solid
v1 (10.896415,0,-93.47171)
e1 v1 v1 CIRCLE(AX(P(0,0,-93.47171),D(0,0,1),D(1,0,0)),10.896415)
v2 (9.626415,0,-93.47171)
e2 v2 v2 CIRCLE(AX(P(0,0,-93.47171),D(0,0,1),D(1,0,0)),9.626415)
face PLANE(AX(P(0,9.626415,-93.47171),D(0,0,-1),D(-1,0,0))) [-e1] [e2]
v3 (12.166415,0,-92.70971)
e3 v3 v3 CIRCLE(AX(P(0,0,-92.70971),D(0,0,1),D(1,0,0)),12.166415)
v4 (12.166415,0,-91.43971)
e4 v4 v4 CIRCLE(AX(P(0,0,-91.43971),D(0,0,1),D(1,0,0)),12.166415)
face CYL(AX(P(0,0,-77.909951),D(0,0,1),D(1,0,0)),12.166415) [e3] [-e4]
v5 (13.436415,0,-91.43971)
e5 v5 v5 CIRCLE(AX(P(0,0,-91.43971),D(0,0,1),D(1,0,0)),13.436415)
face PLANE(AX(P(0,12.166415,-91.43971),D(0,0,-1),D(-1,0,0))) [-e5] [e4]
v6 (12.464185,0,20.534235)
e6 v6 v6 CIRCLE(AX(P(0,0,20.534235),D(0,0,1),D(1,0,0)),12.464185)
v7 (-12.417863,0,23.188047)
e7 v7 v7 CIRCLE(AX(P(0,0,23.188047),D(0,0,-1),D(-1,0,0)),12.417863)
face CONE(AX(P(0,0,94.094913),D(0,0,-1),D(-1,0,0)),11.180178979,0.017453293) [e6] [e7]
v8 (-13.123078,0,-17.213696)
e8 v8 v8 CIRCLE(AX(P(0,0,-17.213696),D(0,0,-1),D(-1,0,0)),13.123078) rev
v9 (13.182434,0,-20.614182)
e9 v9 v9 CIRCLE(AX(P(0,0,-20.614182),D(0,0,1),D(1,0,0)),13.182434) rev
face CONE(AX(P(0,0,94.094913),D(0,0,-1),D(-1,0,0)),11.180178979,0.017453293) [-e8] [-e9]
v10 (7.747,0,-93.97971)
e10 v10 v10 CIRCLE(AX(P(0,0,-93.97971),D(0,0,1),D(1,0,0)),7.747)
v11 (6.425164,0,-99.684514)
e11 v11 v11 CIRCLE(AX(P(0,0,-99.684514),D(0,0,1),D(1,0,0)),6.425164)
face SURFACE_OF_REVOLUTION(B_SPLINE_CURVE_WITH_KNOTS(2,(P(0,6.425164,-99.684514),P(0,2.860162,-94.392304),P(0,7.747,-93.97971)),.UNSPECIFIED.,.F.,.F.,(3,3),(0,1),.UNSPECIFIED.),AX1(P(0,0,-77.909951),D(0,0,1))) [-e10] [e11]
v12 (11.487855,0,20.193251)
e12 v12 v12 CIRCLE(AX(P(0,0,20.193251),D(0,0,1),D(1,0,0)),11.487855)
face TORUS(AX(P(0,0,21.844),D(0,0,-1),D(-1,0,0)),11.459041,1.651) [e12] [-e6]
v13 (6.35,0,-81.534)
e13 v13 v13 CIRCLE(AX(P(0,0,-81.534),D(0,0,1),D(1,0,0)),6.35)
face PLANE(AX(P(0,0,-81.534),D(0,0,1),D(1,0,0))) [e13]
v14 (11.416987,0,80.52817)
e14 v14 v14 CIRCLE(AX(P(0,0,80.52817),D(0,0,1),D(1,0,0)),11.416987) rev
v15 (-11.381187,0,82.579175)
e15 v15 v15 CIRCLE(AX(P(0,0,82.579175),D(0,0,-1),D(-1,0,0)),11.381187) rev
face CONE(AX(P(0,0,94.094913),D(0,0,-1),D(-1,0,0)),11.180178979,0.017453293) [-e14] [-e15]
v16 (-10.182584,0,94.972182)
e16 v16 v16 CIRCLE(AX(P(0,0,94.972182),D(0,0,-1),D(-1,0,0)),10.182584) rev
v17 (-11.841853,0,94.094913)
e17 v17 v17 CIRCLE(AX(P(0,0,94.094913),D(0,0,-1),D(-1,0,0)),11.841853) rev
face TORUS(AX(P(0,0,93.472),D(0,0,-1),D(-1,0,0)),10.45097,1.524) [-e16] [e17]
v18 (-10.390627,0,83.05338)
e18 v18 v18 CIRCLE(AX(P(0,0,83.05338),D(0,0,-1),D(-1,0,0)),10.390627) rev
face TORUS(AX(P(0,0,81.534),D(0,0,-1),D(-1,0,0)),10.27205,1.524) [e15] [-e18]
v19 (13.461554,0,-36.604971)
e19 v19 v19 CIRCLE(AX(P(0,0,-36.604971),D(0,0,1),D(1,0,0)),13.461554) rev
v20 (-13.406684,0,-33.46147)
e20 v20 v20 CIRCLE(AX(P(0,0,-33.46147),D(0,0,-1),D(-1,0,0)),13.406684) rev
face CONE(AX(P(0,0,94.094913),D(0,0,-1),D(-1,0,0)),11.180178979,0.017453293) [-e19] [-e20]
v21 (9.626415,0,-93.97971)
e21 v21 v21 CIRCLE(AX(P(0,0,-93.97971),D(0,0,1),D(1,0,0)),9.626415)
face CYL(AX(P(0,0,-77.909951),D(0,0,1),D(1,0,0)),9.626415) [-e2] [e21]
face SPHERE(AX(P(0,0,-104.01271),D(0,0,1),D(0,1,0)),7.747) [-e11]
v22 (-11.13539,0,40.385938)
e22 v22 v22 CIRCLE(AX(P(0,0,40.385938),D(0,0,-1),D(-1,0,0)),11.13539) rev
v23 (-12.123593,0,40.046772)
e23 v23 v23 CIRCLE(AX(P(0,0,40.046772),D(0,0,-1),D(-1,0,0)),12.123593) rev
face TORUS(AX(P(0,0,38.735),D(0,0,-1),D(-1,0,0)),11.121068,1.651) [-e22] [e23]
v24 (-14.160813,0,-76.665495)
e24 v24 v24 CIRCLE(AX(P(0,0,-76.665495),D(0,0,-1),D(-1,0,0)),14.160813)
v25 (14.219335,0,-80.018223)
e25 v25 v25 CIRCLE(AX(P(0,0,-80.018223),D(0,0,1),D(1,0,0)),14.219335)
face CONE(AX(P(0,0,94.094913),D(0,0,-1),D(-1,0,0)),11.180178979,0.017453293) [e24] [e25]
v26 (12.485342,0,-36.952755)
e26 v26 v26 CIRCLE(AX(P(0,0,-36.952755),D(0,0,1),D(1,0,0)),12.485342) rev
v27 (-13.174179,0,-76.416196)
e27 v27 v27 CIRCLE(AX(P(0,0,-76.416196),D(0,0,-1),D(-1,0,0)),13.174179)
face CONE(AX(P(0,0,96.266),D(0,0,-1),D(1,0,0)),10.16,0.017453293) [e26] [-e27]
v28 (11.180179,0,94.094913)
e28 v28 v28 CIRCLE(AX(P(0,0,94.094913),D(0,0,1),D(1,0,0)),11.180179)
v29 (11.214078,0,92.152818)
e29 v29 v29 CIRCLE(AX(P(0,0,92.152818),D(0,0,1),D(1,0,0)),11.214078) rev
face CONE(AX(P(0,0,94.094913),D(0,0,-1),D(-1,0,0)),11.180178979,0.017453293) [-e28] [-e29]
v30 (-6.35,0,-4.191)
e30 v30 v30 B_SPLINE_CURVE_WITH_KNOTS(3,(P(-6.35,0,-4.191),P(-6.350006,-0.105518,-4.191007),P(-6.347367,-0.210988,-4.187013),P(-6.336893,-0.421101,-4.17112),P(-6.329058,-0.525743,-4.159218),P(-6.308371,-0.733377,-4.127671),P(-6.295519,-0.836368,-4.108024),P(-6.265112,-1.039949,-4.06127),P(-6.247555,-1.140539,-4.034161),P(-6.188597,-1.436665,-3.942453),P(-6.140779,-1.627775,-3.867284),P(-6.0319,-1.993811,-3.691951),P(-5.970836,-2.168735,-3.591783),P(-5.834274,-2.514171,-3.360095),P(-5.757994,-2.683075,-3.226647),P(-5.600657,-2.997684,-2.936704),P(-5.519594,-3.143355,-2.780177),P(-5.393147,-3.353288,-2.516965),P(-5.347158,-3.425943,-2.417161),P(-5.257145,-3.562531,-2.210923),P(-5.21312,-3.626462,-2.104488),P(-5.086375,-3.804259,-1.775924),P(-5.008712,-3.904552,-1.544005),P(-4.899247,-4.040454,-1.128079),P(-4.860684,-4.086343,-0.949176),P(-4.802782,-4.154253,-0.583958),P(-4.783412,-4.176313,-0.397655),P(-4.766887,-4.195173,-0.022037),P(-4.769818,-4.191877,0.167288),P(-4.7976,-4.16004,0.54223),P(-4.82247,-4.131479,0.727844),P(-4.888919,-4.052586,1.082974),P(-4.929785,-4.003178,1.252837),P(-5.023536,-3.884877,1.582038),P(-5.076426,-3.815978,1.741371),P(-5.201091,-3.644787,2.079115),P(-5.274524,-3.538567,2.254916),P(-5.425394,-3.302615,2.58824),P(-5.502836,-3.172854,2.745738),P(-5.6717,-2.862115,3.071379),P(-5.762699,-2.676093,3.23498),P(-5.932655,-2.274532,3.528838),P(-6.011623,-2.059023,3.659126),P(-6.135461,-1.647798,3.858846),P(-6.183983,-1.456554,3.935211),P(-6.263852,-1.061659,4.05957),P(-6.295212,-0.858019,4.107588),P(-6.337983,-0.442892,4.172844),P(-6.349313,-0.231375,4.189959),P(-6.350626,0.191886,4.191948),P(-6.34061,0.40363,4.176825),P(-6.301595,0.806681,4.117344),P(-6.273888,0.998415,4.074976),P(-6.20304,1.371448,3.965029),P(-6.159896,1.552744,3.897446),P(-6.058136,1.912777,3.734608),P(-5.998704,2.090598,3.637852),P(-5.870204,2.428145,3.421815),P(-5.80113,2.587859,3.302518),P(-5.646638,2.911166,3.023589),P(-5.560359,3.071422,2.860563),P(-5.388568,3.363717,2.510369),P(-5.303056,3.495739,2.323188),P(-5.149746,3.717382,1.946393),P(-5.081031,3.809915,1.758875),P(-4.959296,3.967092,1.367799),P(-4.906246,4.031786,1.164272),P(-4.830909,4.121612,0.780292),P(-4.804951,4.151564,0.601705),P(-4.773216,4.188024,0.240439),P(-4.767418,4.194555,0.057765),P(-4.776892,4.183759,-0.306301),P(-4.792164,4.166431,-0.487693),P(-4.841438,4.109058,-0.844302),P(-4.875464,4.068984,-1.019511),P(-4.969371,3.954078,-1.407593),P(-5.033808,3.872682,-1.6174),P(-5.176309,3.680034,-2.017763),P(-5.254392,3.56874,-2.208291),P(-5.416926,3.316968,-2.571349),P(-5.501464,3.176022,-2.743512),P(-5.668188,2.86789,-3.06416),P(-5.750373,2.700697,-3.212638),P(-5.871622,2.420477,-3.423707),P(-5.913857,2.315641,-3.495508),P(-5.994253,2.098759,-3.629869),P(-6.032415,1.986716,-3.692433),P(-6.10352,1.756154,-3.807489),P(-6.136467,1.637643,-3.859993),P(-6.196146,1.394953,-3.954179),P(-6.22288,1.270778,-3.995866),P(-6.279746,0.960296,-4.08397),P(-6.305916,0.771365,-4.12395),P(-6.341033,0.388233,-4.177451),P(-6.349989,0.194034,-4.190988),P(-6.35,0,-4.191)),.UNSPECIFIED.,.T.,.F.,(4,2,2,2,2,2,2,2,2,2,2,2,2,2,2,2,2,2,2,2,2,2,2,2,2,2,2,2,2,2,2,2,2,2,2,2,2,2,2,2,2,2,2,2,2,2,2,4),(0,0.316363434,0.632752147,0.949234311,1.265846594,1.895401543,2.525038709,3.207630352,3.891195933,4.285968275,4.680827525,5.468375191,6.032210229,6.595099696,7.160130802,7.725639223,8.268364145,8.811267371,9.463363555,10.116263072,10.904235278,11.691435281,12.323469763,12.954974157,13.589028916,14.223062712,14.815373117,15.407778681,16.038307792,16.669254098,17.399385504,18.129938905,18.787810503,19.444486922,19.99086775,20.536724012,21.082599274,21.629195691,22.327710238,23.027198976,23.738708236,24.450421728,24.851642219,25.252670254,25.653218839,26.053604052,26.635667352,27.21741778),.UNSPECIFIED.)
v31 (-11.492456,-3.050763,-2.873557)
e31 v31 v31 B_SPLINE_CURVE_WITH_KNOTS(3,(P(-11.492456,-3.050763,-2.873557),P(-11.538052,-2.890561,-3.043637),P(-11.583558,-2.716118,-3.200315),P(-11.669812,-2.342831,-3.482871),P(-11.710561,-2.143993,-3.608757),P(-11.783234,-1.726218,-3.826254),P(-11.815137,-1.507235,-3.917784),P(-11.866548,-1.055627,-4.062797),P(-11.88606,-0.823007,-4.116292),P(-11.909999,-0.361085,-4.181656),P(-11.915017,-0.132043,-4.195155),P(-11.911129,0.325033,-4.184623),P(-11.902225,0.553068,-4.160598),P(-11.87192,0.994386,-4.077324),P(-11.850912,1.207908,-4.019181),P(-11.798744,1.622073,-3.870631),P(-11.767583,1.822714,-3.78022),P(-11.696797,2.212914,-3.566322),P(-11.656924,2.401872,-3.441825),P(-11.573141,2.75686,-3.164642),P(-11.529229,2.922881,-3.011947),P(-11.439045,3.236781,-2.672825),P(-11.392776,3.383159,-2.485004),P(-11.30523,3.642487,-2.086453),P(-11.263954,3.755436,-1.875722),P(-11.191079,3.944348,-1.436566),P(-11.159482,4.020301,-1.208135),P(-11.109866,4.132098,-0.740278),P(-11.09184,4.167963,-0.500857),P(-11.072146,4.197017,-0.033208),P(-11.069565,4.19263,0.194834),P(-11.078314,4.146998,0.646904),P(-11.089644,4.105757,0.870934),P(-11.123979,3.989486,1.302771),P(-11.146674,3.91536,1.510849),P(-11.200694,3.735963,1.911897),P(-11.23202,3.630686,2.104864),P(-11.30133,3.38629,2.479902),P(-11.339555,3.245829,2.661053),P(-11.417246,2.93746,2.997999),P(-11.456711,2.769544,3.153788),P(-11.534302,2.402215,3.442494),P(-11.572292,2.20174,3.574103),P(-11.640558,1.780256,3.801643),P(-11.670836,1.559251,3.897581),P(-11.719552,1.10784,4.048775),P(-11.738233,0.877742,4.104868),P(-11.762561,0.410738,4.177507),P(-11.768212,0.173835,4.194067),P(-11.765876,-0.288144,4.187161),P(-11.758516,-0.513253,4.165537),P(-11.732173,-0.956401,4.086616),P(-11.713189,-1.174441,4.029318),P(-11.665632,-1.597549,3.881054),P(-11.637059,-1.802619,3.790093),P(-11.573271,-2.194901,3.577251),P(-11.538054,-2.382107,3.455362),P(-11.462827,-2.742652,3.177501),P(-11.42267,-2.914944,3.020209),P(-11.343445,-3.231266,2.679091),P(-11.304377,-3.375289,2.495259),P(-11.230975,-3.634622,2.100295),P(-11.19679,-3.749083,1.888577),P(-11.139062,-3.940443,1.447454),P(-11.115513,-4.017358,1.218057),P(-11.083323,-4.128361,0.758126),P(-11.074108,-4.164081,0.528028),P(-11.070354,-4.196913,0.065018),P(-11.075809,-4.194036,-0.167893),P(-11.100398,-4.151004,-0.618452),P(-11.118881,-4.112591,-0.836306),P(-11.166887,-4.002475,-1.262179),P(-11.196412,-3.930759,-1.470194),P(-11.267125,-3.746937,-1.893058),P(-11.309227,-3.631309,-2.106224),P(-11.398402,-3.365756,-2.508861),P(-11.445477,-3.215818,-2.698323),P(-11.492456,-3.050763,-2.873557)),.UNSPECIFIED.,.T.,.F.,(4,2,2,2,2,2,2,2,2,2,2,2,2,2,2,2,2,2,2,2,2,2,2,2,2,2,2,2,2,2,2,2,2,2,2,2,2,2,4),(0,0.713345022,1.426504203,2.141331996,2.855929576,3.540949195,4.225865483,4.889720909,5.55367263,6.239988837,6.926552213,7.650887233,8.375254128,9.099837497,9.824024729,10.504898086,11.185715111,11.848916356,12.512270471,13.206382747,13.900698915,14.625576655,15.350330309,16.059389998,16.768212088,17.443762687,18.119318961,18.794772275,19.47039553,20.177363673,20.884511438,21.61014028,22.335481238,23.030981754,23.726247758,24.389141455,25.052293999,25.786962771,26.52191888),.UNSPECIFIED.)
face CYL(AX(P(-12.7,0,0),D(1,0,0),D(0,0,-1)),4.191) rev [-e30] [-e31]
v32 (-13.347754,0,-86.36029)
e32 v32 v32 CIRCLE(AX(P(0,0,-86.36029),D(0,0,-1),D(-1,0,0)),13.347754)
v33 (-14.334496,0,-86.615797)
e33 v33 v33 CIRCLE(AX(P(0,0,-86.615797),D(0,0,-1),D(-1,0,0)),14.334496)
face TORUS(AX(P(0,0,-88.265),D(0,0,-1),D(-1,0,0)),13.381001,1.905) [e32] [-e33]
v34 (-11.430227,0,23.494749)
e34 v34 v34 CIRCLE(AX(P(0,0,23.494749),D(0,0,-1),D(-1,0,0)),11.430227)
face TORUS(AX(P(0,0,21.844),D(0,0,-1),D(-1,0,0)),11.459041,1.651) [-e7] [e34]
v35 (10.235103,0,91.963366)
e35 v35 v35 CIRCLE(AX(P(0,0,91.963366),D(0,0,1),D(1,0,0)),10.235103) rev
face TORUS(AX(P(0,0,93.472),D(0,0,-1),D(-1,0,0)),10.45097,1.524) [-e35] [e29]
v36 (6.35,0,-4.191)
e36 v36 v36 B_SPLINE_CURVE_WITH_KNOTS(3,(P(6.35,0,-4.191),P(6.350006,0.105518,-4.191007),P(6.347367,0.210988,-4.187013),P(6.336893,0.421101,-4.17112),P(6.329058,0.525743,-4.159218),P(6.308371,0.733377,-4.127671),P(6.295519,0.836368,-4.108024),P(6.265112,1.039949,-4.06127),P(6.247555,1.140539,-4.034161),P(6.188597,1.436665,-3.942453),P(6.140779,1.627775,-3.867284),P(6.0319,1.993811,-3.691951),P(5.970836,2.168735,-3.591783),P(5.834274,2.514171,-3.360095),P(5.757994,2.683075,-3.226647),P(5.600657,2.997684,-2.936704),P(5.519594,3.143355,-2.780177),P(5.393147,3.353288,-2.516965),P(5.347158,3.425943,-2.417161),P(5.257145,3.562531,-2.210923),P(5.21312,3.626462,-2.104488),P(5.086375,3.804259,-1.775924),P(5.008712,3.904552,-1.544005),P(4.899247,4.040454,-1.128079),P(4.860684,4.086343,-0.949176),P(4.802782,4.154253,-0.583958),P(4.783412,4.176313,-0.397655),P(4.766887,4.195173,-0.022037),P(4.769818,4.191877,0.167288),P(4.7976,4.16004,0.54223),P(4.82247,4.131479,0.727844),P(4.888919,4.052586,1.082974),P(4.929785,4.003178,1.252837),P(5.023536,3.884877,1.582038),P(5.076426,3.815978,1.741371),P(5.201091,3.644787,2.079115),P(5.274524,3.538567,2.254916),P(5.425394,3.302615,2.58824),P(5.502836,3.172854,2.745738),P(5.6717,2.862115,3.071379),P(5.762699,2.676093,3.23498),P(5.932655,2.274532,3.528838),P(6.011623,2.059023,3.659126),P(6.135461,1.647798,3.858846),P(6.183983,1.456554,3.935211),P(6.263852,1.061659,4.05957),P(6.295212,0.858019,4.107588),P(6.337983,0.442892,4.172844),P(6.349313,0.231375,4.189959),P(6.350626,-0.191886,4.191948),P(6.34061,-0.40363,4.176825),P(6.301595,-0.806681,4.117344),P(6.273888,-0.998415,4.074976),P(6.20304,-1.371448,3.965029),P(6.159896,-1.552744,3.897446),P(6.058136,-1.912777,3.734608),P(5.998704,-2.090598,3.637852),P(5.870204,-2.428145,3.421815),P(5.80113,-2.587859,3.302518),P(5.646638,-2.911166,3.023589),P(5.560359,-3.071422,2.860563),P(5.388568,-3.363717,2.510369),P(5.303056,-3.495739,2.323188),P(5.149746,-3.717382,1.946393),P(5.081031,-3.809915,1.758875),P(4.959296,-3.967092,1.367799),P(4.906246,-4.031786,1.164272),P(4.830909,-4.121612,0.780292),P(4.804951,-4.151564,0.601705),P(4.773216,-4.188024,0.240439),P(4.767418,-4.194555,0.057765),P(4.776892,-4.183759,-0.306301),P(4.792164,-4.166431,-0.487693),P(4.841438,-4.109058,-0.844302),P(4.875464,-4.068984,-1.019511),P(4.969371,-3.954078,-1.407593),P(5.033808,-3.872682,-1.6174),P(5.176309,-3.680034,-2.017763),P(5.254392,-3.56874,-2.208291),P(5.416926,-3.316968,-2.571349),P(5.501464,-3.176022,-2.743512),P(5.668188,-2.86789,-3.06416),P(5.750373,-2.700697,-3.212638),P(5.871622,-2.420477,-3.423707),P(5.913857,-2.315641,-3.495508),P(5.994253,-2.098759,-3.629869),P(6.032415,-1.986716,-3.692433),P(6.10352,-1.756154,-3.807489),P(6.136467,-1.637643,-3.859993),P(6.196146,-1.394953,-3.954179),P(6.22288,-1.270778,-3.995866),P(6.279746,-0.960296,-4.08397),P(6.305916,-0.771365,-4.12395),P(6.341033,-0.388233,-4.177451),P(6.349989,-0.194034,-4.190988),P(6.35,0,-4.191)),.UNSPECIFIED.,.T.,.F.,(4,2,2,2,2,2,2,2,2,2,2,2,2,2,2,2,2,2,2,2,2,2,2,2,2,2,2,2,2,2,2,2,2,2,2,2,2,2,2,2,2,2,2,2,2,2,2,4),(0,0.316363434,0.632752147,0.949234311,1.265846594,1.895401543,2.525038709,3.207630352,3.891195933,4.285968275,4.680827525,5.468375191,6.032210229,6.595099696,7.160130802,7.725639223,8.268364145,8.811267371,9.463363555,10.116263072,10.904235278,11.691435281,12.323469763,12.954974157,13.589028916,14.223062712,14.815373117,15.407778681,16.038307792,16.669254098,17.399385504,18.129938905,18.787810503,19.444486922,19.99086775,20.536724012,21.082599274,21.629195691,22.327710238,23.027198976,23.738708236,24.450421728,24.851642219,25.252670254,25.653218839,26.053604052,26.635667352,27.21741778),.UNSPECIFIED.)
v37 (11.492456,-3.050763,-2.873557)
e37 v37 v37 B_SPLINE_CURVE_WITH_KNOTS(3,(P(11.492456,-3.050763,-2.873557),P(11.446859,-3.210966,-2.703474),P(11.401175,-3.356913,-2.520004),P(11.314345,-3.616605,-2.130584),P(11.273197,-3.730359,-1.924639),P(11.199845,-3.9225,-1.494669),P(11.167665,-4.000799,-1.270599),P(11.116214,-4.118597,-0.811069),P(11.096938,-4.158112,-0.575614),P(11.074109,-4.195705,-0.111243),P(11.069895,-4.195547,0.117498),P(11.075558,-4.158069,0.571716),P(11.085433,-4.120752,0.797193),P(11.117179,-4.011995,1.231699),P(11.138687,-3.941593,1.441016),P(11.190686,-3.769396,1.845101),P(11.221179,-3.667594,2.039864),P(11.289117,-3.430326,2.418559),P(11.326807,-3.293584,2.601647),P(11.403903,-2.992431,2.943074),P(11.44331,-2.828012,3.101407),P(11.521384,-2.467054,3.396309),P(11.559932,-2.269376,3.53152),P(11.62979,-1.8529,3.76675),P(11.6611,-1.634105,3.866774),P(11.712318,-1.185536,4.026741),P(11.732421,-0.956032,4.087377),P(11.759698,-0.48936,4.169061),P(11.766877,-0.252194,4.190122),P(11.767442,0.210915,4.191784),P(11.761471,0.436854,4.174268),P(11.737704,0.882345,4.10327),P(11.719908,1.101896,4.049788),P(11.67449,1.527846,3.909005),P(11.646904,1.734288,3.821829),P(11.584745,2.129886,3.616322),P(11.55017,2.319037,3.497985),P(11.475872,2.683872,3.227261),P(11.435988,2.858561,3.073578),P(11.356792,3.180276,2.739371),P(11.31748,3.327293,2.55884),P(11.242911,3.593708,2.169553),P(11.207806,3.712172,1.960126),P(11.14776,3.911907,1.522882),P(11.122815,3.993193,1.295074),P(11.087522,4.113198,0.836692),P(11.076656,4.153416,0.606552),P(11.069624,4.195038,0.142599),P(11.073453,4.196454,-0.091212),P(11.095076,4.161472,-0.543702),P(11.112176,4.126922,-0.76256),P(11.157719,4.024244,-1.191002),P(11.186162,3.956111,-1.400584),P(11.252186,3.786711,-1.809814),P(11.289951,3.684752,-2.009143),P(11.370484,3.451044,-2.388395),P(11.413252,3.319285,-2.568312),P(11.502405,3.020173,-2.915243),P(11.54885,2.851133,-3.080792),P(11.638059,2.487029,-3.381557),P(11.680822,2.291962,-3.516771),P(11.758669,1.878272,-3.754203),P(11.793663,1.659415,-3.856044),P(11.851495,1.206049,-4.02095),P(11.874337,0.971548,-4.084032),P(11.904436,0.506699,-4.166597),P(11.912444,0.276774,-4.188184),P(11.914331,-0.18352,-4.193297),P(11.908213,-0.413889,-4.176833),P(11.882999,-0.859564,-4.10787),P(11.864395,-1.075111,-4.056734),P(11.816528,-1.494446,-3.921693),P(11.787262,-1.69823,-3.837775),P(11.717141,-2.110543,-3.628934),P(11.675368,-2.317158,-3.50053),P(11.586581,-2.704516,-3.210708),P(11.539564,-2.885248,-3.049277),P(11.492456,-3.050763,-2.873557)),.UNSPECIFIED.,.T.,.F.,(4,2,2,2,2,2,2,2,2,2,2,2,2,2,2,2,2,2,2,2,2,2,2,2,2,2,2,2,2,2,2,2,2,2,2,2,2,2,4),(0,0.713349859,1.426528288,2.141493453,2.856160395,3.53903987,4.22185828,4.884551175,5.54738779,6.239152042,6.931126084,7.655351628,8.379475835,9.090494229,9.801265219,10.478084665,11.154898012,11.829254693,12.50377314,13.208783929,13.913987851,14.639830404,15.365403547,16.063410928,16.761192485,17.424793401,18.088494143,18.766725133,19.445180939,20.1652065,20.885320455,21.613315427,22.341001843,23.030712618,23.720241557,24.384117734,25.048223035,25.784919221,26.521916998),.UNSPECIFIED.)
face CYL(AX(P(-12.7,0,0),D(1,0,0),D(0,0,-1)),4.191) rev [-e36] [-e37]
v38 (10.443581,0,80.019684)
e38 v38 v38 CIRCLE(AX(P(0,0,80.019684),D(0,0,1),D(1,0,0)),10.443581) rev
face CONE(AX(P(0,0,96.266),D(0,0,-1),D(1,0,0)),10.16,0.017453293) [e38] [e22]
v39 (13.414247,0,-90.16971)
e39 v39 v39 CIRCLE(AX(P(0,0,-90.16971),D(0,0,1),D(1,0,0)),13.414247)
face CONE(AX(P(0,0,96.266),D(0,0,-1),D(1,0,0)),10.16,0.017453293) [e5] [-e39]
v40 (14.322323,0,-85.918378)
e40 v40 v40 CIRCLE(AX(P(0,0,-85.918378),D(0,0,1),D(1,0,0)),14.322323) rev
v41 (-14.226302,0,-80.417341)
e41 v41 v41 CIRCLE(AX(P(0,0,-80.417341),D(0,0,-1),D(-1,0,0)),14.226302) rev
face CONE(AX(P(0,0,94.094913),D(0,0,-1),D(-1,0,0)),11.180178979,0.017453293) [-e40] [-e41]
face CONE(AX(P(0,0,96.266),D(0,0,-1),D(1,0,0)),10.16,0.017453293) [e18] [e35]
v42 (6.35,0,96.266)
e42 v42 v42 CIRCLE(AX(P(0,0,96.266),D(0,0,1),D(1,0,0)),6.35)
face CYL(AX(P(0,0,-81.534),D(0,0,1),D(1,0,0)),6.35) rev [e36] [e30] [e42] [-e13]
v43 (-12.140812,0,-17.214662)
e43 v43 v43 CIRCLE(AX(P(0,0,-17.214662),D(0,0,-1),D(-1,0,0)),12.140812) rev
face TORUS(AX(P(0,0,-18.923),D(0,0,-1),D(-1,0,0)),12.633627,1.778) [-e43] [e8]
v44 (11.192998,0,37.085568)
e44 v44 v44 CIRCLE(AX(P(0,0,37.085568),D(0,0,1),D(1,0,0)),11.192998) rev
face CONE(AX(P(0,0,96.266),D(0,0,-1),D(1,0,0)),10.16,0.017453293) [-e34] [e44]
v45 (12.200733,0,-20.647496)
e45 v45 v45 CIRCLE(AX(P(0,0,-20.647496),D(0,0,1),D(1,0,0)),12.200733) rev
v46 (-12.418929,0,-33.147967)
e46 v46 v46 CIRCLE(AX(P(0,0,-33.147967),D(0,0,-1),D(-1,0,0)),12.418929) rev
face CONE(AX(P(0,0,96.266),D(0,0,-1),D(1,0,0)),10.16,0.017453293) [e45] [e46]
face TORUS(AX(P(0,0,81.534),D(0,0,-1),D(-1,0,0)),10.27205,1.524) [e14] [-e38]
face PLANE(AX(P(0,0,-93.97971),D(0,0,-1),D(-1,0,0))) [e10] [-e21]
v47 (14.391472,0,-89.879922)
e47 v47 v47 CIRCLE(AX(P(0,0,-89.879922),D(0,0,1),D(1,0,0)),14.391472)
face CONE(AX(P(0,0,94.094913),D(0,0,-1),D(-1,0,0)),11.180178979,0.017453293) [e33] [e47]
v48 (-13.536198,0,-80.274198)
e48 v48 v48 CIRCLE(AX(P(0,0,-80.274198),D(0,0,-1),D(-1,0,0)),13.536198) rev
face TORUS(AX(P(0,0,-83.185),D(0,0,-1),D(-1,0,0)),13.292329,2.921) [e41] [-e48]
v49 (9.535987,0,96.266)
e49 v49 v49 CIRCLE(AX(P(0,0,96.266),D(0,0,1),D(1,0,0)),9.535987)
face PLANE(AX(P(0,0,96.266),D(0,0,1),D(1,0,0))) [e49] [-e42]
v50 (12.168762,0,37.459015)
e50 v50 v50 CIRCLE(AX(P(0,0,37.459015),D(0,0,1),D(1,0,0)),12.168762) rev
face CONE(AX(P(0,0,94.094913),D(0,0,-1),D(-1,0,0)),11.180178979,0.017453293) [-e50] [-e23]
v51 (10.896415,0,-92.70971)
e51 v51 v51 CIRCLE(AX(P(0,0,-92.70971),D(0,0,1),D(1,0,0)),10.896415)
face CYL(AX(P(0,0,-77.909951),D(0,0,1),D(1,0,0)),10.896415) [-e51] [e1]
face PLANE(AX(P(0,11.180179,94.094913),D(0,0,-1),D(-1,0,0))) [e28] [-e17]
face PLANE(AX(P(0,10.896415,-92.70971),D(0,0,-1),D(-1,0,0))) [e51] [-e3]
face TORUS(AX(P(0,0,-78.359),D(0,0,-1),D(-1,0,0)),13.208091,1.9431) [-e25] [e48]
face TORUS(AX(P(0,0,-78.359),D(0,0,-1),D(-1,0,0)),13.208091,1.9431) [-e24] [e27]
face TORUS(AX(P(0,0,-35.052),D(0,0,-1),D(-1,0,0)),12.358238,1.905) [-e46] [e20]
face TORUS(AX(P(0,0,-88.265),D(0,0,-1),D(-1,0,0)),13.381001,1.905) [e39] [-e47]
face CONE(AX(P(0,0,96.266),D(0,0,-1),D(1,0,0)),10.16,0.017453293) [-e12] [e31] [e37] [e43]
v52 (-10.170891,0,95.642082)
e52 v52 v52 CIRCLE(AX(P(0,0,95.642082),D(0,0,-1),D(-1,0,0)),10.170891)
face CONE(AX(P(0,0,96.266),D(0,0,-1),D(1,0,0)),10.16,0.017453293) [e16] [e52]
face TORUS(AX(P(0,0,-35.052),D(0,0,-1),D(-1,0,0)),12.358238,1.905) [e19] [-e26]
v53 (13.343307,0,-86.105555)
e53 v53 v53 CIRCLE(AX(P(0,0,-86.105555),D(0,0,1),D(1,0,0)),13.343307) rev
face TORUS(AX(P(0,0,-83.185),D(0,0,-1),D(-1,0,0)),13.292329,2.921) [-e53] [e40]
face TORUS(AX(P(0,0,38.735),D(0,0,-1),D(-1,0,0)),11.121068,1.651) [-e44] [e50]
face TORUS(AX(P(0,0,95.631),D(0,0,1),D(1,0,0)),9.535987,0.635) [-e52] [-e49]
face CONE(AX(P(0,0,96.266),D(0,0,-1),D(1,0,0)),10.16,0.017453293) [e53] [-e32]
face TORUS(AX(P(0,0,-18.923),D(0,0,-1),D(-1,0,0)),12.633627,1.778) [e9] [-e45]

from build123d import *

# Parameters (mm, degrees)
SKETCH1_R           = 10.16
BOSS_EXTRUDE1_DEPTH = 96.266
DRAFT1_ANGLE        = 1
SKETCH3_R           = 1.524
FILLET1_R           = 0.635
SKETCH4_R           = 6.35
CUT_EXTRUDE1_DEPTH  = 177.8
SKETCH7_R           = 1.524
SKETCH9_R           = 1.651
SKETCH11_R          = 1.651
SKETCH13_R          = 1.778
SKETCH15_R          = 1.905
SKETCH16_R          = 4.191
CUT_EXTRUDE2_DEPTH  = 12.7
SKETCH18_R          = 1.9431
SKETCH20_R          = 2.921
SKETCH22_R          = 1.905


with BuildPart() as part:
    # Sketch1 → Boss-Extrude1 (new, symmetric)
    with BuildSketch(Plane.XY):
        Circle(SKETCH1_R)
    extrude(amount=BOSS_EXTRUDE1_DEPTH, both=True)

    # Draft1
    draft1_faces = [part.faces().sort_by_distance(p)[0] for p in [
        (-10.16, 0, 0),
    ]]
    draft(draft1_faces, Plane.XY.offset(96.266), DRAFT1_ANGLE)

    # Sweep1: sweep along a path in Sketch2
    with BuildLine(Plane.XY.offset(93.472)) as sweep1_path:
        CenterArc((0, 0), 10.16, 0, 360)
    # Sketch3 → Sweep1 (sweep)
    with BuildSketch(Plane(origin=(0, 0, 0), x_dir=(1, 0, 0), z_dir=(0, 1, 0))):
        with Locations((-10.450969822, -93.472)):
            Circle(SKETCH3_R)
    sweep(path=sweep1_path.line)

    # Fillet1
    fillet1_edges = [part.edges().sort_by_distance(p)[0] for p in [
        (-10.16, 0, 96.266),
    ]]
    fillet(fillet1_edges, radius=FILLET1_R)

    # Sketch4 → Cut-Extrude1 (cut)
    with BuildSketch(Plane.XY.offset(96.266)):
        Circle(SKETCH4_R)
    extrude(amount=-CUT_EXTRUDE1_DEPTH, mode=Mode.SUBTRACT)

    # Sweep2: sweep along a path in Sketch6
    with BuildLine(Plane.XY.offset(81.534)) as sweep2_path:
        CenterArc((0, 0), 10.377555118, 0, 360)
    # Sketch7 → Sweep2 (sweep)
    with BuildSketch(Plane(origin=(0, 0, 0), x_dir=(1, 0, 0), z_dir=(0, 1, 0))):
        with Locations((-10.272049999, -81.534)):
            Circle(SKETCH7_R)
    sweep(path=sweep2_path.line)

    # Sweep3: sweep along a path in Sketch8
    with BuildLine(Plane.XY.offset(38.735)) as sweep3_path:
        CenterArc((0, 0), 11.176, 0, 360)
    # Sketch9 → Sweep3 (sweep)
    with BuildSketch(Plane(origin=(0, 0, 0), x_dir=(1, 0, 0), z_dir=(0, 1, 0))):
        with Locations((-11.121067971, -38.735)):
            Circle(SKETCH9_R)
    sweep(path=sweep3_path.line)

    # Sweep4: sweep along a path in Sketch10
    with BuildLine(Plane.XY.offset(21.844)) as sweep4_path:
        CenterArc((0, 0), 11.383561293, 0, 360)
    # Sketch11 → Sweep4 (sweep)
    with BuildSketch(Plane(origin=(0, 0, 0), x_dir=(1, 0, 0), z_dir=(0, 1, 0))):
        with Locations((11.459040842, -21.844)):
            Circle(SKETCH11_R)
    sweep(path=sweep4_path.line)

    # Sweep5: sweep along a path in Sketch12
    with BuildLine(Plane.XY.offset(-18.923)) as sweep5_path:
        CenterArc((0, 0), 12.119588541, 0, 360)
    # Sketch13 → Sweep5 (sweep)
    with BuildSketch(Plane(origin=(0, 0, 0), x_dir=(1, 0, 0), z_dir=(0, 1, 0))):
        with Locations((-12.633626754, 18.923)):
            Circle(SKETCH13_R)
    sweep(path=sweep5_path.line)

    # Sweep6: sweep along a path in Sketch14
    with BuildLine(Plane.XY.offset(-35.052)) as sweep6_path:
        CenterArc((0, 0), 12.446, 0, 360)
    # Sketch15 → Sweep6 (sweep)
    with BuildSketch(Plane(origin=(0, 0, 0), x_dir=(1, 0, 0), z_dir=(0, 1, 0))):
        with Locations((-12.358237891, 35.052)):
            Circle(SKETCH15_R)
    sweep(path=sweep6_path.line)

    # Sketch16 → Cut-Extrude2 (cut, symmetric)
    with BuildSketch(Plane(origin=(0, 0, 0), x_dir=(0, 0, -1), z_dir=(1, 0, 0))):
        Circle(SKETCH16_R)
    extrude(amount=CUT_EXTRUDE2_DEPTH, both=True, mode=Mode.SUBTRACT)

    # Sweep7: sweep along a path in Sketch17
    with BuildLine(Plane.XY.offset(-78.359)) as sweep7_path:
        CenterArc((0, 0), 12.7, 0, 360)
    # Sketch18 → Sweep7 (sweep)
    with BuildSketch(Plane(origin=(0, 0, 0), x_dir=(1, 0, 0), z_dir=(0, 1, 0))):
        with Locations((13.208090713, 78.359)):
            Circle(SKETCH18_R)
    sweep(path=sweep7_path.line)

    # Sweep8: sweep along a path in Sketch19
    with BuildLine(Plane.XY.offset(-83.185)) as sweep8_path:
        CenterArc((0, 0), 13.165167036, 0, 360)
    # Sketch20 → Sweep8 (sweep)
    with BuildSketch(Plane(origin=(0, 0, 0), x_dir=(1, 0, 0), z_dir=(0, 1, 0))):
        with Locations((-13.292328856, 83.185)):
            Circle(SKETCH20_R)
    sweep(path=sweep8_path.line)

    # Sweep9: sweep along a path in Sketch21
    with BuildLine(Plane.XY.offset(-88.265)) as sweep9_path:
        CenterArc((0, 0), 13.260744508, 0, 360)
    # Sketch22 → Sweep9 (sweep)
    with BuildSketch(Plane(origin=(0, 0, 0), x_dir=(1, 0, 0), z_dir=(0, 1, 0))):
        with Locations((13.381000586, 88.265)):
            Circle(SKETCH22_R)
    sweep(path=sweep9_path.line)

    # Sketch24 → Cut-Revolve1 (revolve, cut)
    with BuildSketch(Plane(origin=(0, 0, 0), x_dir=(0, 0, -1), z_dir=(1, 0, 0)), mode=Mode.PRIVATE) as cut_revolve1_sk:
        Polygon((-94.09491302, 11.180178979), (103.613491758, 14.631192021), (103.613491758, 22.99281931), (-94.09491302, 19.541806268), align=None)
    revolve(cut_revolve1_sk.sketch.rotate(Axis((0, 0, 94.09491302), (0, 0, 1)), 90), axis=Axis((0, 0, 94.09491302), (0, 0, 1)), mode=Mode.SUBTRACT)

    # Sketch30 → Cut-Revolve2 (revolve, cut)
    with BuildSketch(Plane(origin=(0, 0, 0), x_dir=(0, 0, -1), z_dir=(1, 0, 0)), mode=Mode.PRIVATE) as cut_revolve2_sk:
        Polygon((90.169709859, 13.436415353), (90.169709859, 14.860229661), (98.026290569, 14.860229661), (98.026290569, 0), (93.979709859, 0), (93.979709859, 9.626415353), (93.471709859, 9.626415353), (93.471709859, 10.896415353), (92.709709859, 10.896415353), (92.709709859, 12.166415353), (91.439709859, 12.166415353), (91.439709859, 13.436415353), align=None)
    revolve(cut_revolve2_sk.sketch.rotate(Axis((0, 0, -77.909950756), (0, 0, -1)), 270), axis=Axis((0, 0, -77.909950756), (0, 0, -1)), mode=Mode.SUBTRACT)

    # Sketch31 → Revolve1 (revolve)
    with BuildSketch(Plane(origin=(0, 0, 0), x_dir=(0, 0, -1), z_dir=(1, 0, 0)), mode=Mode.PRIVATE) as revolve1_sk:
        with BuildLine():
            Line((96.265709859, 0), (111.759709859, 0))
            ThreePointArc((111.759709859, 0), (107.651767323, 6.839098608), (99.684514358, 6.425164021))
            add(Edge.make_bspline(
                [(99.684514358, 6.425164021), (94.392303812, 2.860162132), (93.979709859, 7.747)],
                knots=[0, 0, 0, 1, 1, 1], degree=2))
            Line((93.979709859, 7.747), (93.979709859, 0))
            Line((93.979709859, 0), (96.265709859, 0))
        make_face()
    revolve(revolve1_sk.sketch.rotate(Axis((0, 0, -72.29810707), (0, 0, -1)), 270), axis=Axis((0, 0, -72.29810707), (0, 0, -1)))


solid = part.part
